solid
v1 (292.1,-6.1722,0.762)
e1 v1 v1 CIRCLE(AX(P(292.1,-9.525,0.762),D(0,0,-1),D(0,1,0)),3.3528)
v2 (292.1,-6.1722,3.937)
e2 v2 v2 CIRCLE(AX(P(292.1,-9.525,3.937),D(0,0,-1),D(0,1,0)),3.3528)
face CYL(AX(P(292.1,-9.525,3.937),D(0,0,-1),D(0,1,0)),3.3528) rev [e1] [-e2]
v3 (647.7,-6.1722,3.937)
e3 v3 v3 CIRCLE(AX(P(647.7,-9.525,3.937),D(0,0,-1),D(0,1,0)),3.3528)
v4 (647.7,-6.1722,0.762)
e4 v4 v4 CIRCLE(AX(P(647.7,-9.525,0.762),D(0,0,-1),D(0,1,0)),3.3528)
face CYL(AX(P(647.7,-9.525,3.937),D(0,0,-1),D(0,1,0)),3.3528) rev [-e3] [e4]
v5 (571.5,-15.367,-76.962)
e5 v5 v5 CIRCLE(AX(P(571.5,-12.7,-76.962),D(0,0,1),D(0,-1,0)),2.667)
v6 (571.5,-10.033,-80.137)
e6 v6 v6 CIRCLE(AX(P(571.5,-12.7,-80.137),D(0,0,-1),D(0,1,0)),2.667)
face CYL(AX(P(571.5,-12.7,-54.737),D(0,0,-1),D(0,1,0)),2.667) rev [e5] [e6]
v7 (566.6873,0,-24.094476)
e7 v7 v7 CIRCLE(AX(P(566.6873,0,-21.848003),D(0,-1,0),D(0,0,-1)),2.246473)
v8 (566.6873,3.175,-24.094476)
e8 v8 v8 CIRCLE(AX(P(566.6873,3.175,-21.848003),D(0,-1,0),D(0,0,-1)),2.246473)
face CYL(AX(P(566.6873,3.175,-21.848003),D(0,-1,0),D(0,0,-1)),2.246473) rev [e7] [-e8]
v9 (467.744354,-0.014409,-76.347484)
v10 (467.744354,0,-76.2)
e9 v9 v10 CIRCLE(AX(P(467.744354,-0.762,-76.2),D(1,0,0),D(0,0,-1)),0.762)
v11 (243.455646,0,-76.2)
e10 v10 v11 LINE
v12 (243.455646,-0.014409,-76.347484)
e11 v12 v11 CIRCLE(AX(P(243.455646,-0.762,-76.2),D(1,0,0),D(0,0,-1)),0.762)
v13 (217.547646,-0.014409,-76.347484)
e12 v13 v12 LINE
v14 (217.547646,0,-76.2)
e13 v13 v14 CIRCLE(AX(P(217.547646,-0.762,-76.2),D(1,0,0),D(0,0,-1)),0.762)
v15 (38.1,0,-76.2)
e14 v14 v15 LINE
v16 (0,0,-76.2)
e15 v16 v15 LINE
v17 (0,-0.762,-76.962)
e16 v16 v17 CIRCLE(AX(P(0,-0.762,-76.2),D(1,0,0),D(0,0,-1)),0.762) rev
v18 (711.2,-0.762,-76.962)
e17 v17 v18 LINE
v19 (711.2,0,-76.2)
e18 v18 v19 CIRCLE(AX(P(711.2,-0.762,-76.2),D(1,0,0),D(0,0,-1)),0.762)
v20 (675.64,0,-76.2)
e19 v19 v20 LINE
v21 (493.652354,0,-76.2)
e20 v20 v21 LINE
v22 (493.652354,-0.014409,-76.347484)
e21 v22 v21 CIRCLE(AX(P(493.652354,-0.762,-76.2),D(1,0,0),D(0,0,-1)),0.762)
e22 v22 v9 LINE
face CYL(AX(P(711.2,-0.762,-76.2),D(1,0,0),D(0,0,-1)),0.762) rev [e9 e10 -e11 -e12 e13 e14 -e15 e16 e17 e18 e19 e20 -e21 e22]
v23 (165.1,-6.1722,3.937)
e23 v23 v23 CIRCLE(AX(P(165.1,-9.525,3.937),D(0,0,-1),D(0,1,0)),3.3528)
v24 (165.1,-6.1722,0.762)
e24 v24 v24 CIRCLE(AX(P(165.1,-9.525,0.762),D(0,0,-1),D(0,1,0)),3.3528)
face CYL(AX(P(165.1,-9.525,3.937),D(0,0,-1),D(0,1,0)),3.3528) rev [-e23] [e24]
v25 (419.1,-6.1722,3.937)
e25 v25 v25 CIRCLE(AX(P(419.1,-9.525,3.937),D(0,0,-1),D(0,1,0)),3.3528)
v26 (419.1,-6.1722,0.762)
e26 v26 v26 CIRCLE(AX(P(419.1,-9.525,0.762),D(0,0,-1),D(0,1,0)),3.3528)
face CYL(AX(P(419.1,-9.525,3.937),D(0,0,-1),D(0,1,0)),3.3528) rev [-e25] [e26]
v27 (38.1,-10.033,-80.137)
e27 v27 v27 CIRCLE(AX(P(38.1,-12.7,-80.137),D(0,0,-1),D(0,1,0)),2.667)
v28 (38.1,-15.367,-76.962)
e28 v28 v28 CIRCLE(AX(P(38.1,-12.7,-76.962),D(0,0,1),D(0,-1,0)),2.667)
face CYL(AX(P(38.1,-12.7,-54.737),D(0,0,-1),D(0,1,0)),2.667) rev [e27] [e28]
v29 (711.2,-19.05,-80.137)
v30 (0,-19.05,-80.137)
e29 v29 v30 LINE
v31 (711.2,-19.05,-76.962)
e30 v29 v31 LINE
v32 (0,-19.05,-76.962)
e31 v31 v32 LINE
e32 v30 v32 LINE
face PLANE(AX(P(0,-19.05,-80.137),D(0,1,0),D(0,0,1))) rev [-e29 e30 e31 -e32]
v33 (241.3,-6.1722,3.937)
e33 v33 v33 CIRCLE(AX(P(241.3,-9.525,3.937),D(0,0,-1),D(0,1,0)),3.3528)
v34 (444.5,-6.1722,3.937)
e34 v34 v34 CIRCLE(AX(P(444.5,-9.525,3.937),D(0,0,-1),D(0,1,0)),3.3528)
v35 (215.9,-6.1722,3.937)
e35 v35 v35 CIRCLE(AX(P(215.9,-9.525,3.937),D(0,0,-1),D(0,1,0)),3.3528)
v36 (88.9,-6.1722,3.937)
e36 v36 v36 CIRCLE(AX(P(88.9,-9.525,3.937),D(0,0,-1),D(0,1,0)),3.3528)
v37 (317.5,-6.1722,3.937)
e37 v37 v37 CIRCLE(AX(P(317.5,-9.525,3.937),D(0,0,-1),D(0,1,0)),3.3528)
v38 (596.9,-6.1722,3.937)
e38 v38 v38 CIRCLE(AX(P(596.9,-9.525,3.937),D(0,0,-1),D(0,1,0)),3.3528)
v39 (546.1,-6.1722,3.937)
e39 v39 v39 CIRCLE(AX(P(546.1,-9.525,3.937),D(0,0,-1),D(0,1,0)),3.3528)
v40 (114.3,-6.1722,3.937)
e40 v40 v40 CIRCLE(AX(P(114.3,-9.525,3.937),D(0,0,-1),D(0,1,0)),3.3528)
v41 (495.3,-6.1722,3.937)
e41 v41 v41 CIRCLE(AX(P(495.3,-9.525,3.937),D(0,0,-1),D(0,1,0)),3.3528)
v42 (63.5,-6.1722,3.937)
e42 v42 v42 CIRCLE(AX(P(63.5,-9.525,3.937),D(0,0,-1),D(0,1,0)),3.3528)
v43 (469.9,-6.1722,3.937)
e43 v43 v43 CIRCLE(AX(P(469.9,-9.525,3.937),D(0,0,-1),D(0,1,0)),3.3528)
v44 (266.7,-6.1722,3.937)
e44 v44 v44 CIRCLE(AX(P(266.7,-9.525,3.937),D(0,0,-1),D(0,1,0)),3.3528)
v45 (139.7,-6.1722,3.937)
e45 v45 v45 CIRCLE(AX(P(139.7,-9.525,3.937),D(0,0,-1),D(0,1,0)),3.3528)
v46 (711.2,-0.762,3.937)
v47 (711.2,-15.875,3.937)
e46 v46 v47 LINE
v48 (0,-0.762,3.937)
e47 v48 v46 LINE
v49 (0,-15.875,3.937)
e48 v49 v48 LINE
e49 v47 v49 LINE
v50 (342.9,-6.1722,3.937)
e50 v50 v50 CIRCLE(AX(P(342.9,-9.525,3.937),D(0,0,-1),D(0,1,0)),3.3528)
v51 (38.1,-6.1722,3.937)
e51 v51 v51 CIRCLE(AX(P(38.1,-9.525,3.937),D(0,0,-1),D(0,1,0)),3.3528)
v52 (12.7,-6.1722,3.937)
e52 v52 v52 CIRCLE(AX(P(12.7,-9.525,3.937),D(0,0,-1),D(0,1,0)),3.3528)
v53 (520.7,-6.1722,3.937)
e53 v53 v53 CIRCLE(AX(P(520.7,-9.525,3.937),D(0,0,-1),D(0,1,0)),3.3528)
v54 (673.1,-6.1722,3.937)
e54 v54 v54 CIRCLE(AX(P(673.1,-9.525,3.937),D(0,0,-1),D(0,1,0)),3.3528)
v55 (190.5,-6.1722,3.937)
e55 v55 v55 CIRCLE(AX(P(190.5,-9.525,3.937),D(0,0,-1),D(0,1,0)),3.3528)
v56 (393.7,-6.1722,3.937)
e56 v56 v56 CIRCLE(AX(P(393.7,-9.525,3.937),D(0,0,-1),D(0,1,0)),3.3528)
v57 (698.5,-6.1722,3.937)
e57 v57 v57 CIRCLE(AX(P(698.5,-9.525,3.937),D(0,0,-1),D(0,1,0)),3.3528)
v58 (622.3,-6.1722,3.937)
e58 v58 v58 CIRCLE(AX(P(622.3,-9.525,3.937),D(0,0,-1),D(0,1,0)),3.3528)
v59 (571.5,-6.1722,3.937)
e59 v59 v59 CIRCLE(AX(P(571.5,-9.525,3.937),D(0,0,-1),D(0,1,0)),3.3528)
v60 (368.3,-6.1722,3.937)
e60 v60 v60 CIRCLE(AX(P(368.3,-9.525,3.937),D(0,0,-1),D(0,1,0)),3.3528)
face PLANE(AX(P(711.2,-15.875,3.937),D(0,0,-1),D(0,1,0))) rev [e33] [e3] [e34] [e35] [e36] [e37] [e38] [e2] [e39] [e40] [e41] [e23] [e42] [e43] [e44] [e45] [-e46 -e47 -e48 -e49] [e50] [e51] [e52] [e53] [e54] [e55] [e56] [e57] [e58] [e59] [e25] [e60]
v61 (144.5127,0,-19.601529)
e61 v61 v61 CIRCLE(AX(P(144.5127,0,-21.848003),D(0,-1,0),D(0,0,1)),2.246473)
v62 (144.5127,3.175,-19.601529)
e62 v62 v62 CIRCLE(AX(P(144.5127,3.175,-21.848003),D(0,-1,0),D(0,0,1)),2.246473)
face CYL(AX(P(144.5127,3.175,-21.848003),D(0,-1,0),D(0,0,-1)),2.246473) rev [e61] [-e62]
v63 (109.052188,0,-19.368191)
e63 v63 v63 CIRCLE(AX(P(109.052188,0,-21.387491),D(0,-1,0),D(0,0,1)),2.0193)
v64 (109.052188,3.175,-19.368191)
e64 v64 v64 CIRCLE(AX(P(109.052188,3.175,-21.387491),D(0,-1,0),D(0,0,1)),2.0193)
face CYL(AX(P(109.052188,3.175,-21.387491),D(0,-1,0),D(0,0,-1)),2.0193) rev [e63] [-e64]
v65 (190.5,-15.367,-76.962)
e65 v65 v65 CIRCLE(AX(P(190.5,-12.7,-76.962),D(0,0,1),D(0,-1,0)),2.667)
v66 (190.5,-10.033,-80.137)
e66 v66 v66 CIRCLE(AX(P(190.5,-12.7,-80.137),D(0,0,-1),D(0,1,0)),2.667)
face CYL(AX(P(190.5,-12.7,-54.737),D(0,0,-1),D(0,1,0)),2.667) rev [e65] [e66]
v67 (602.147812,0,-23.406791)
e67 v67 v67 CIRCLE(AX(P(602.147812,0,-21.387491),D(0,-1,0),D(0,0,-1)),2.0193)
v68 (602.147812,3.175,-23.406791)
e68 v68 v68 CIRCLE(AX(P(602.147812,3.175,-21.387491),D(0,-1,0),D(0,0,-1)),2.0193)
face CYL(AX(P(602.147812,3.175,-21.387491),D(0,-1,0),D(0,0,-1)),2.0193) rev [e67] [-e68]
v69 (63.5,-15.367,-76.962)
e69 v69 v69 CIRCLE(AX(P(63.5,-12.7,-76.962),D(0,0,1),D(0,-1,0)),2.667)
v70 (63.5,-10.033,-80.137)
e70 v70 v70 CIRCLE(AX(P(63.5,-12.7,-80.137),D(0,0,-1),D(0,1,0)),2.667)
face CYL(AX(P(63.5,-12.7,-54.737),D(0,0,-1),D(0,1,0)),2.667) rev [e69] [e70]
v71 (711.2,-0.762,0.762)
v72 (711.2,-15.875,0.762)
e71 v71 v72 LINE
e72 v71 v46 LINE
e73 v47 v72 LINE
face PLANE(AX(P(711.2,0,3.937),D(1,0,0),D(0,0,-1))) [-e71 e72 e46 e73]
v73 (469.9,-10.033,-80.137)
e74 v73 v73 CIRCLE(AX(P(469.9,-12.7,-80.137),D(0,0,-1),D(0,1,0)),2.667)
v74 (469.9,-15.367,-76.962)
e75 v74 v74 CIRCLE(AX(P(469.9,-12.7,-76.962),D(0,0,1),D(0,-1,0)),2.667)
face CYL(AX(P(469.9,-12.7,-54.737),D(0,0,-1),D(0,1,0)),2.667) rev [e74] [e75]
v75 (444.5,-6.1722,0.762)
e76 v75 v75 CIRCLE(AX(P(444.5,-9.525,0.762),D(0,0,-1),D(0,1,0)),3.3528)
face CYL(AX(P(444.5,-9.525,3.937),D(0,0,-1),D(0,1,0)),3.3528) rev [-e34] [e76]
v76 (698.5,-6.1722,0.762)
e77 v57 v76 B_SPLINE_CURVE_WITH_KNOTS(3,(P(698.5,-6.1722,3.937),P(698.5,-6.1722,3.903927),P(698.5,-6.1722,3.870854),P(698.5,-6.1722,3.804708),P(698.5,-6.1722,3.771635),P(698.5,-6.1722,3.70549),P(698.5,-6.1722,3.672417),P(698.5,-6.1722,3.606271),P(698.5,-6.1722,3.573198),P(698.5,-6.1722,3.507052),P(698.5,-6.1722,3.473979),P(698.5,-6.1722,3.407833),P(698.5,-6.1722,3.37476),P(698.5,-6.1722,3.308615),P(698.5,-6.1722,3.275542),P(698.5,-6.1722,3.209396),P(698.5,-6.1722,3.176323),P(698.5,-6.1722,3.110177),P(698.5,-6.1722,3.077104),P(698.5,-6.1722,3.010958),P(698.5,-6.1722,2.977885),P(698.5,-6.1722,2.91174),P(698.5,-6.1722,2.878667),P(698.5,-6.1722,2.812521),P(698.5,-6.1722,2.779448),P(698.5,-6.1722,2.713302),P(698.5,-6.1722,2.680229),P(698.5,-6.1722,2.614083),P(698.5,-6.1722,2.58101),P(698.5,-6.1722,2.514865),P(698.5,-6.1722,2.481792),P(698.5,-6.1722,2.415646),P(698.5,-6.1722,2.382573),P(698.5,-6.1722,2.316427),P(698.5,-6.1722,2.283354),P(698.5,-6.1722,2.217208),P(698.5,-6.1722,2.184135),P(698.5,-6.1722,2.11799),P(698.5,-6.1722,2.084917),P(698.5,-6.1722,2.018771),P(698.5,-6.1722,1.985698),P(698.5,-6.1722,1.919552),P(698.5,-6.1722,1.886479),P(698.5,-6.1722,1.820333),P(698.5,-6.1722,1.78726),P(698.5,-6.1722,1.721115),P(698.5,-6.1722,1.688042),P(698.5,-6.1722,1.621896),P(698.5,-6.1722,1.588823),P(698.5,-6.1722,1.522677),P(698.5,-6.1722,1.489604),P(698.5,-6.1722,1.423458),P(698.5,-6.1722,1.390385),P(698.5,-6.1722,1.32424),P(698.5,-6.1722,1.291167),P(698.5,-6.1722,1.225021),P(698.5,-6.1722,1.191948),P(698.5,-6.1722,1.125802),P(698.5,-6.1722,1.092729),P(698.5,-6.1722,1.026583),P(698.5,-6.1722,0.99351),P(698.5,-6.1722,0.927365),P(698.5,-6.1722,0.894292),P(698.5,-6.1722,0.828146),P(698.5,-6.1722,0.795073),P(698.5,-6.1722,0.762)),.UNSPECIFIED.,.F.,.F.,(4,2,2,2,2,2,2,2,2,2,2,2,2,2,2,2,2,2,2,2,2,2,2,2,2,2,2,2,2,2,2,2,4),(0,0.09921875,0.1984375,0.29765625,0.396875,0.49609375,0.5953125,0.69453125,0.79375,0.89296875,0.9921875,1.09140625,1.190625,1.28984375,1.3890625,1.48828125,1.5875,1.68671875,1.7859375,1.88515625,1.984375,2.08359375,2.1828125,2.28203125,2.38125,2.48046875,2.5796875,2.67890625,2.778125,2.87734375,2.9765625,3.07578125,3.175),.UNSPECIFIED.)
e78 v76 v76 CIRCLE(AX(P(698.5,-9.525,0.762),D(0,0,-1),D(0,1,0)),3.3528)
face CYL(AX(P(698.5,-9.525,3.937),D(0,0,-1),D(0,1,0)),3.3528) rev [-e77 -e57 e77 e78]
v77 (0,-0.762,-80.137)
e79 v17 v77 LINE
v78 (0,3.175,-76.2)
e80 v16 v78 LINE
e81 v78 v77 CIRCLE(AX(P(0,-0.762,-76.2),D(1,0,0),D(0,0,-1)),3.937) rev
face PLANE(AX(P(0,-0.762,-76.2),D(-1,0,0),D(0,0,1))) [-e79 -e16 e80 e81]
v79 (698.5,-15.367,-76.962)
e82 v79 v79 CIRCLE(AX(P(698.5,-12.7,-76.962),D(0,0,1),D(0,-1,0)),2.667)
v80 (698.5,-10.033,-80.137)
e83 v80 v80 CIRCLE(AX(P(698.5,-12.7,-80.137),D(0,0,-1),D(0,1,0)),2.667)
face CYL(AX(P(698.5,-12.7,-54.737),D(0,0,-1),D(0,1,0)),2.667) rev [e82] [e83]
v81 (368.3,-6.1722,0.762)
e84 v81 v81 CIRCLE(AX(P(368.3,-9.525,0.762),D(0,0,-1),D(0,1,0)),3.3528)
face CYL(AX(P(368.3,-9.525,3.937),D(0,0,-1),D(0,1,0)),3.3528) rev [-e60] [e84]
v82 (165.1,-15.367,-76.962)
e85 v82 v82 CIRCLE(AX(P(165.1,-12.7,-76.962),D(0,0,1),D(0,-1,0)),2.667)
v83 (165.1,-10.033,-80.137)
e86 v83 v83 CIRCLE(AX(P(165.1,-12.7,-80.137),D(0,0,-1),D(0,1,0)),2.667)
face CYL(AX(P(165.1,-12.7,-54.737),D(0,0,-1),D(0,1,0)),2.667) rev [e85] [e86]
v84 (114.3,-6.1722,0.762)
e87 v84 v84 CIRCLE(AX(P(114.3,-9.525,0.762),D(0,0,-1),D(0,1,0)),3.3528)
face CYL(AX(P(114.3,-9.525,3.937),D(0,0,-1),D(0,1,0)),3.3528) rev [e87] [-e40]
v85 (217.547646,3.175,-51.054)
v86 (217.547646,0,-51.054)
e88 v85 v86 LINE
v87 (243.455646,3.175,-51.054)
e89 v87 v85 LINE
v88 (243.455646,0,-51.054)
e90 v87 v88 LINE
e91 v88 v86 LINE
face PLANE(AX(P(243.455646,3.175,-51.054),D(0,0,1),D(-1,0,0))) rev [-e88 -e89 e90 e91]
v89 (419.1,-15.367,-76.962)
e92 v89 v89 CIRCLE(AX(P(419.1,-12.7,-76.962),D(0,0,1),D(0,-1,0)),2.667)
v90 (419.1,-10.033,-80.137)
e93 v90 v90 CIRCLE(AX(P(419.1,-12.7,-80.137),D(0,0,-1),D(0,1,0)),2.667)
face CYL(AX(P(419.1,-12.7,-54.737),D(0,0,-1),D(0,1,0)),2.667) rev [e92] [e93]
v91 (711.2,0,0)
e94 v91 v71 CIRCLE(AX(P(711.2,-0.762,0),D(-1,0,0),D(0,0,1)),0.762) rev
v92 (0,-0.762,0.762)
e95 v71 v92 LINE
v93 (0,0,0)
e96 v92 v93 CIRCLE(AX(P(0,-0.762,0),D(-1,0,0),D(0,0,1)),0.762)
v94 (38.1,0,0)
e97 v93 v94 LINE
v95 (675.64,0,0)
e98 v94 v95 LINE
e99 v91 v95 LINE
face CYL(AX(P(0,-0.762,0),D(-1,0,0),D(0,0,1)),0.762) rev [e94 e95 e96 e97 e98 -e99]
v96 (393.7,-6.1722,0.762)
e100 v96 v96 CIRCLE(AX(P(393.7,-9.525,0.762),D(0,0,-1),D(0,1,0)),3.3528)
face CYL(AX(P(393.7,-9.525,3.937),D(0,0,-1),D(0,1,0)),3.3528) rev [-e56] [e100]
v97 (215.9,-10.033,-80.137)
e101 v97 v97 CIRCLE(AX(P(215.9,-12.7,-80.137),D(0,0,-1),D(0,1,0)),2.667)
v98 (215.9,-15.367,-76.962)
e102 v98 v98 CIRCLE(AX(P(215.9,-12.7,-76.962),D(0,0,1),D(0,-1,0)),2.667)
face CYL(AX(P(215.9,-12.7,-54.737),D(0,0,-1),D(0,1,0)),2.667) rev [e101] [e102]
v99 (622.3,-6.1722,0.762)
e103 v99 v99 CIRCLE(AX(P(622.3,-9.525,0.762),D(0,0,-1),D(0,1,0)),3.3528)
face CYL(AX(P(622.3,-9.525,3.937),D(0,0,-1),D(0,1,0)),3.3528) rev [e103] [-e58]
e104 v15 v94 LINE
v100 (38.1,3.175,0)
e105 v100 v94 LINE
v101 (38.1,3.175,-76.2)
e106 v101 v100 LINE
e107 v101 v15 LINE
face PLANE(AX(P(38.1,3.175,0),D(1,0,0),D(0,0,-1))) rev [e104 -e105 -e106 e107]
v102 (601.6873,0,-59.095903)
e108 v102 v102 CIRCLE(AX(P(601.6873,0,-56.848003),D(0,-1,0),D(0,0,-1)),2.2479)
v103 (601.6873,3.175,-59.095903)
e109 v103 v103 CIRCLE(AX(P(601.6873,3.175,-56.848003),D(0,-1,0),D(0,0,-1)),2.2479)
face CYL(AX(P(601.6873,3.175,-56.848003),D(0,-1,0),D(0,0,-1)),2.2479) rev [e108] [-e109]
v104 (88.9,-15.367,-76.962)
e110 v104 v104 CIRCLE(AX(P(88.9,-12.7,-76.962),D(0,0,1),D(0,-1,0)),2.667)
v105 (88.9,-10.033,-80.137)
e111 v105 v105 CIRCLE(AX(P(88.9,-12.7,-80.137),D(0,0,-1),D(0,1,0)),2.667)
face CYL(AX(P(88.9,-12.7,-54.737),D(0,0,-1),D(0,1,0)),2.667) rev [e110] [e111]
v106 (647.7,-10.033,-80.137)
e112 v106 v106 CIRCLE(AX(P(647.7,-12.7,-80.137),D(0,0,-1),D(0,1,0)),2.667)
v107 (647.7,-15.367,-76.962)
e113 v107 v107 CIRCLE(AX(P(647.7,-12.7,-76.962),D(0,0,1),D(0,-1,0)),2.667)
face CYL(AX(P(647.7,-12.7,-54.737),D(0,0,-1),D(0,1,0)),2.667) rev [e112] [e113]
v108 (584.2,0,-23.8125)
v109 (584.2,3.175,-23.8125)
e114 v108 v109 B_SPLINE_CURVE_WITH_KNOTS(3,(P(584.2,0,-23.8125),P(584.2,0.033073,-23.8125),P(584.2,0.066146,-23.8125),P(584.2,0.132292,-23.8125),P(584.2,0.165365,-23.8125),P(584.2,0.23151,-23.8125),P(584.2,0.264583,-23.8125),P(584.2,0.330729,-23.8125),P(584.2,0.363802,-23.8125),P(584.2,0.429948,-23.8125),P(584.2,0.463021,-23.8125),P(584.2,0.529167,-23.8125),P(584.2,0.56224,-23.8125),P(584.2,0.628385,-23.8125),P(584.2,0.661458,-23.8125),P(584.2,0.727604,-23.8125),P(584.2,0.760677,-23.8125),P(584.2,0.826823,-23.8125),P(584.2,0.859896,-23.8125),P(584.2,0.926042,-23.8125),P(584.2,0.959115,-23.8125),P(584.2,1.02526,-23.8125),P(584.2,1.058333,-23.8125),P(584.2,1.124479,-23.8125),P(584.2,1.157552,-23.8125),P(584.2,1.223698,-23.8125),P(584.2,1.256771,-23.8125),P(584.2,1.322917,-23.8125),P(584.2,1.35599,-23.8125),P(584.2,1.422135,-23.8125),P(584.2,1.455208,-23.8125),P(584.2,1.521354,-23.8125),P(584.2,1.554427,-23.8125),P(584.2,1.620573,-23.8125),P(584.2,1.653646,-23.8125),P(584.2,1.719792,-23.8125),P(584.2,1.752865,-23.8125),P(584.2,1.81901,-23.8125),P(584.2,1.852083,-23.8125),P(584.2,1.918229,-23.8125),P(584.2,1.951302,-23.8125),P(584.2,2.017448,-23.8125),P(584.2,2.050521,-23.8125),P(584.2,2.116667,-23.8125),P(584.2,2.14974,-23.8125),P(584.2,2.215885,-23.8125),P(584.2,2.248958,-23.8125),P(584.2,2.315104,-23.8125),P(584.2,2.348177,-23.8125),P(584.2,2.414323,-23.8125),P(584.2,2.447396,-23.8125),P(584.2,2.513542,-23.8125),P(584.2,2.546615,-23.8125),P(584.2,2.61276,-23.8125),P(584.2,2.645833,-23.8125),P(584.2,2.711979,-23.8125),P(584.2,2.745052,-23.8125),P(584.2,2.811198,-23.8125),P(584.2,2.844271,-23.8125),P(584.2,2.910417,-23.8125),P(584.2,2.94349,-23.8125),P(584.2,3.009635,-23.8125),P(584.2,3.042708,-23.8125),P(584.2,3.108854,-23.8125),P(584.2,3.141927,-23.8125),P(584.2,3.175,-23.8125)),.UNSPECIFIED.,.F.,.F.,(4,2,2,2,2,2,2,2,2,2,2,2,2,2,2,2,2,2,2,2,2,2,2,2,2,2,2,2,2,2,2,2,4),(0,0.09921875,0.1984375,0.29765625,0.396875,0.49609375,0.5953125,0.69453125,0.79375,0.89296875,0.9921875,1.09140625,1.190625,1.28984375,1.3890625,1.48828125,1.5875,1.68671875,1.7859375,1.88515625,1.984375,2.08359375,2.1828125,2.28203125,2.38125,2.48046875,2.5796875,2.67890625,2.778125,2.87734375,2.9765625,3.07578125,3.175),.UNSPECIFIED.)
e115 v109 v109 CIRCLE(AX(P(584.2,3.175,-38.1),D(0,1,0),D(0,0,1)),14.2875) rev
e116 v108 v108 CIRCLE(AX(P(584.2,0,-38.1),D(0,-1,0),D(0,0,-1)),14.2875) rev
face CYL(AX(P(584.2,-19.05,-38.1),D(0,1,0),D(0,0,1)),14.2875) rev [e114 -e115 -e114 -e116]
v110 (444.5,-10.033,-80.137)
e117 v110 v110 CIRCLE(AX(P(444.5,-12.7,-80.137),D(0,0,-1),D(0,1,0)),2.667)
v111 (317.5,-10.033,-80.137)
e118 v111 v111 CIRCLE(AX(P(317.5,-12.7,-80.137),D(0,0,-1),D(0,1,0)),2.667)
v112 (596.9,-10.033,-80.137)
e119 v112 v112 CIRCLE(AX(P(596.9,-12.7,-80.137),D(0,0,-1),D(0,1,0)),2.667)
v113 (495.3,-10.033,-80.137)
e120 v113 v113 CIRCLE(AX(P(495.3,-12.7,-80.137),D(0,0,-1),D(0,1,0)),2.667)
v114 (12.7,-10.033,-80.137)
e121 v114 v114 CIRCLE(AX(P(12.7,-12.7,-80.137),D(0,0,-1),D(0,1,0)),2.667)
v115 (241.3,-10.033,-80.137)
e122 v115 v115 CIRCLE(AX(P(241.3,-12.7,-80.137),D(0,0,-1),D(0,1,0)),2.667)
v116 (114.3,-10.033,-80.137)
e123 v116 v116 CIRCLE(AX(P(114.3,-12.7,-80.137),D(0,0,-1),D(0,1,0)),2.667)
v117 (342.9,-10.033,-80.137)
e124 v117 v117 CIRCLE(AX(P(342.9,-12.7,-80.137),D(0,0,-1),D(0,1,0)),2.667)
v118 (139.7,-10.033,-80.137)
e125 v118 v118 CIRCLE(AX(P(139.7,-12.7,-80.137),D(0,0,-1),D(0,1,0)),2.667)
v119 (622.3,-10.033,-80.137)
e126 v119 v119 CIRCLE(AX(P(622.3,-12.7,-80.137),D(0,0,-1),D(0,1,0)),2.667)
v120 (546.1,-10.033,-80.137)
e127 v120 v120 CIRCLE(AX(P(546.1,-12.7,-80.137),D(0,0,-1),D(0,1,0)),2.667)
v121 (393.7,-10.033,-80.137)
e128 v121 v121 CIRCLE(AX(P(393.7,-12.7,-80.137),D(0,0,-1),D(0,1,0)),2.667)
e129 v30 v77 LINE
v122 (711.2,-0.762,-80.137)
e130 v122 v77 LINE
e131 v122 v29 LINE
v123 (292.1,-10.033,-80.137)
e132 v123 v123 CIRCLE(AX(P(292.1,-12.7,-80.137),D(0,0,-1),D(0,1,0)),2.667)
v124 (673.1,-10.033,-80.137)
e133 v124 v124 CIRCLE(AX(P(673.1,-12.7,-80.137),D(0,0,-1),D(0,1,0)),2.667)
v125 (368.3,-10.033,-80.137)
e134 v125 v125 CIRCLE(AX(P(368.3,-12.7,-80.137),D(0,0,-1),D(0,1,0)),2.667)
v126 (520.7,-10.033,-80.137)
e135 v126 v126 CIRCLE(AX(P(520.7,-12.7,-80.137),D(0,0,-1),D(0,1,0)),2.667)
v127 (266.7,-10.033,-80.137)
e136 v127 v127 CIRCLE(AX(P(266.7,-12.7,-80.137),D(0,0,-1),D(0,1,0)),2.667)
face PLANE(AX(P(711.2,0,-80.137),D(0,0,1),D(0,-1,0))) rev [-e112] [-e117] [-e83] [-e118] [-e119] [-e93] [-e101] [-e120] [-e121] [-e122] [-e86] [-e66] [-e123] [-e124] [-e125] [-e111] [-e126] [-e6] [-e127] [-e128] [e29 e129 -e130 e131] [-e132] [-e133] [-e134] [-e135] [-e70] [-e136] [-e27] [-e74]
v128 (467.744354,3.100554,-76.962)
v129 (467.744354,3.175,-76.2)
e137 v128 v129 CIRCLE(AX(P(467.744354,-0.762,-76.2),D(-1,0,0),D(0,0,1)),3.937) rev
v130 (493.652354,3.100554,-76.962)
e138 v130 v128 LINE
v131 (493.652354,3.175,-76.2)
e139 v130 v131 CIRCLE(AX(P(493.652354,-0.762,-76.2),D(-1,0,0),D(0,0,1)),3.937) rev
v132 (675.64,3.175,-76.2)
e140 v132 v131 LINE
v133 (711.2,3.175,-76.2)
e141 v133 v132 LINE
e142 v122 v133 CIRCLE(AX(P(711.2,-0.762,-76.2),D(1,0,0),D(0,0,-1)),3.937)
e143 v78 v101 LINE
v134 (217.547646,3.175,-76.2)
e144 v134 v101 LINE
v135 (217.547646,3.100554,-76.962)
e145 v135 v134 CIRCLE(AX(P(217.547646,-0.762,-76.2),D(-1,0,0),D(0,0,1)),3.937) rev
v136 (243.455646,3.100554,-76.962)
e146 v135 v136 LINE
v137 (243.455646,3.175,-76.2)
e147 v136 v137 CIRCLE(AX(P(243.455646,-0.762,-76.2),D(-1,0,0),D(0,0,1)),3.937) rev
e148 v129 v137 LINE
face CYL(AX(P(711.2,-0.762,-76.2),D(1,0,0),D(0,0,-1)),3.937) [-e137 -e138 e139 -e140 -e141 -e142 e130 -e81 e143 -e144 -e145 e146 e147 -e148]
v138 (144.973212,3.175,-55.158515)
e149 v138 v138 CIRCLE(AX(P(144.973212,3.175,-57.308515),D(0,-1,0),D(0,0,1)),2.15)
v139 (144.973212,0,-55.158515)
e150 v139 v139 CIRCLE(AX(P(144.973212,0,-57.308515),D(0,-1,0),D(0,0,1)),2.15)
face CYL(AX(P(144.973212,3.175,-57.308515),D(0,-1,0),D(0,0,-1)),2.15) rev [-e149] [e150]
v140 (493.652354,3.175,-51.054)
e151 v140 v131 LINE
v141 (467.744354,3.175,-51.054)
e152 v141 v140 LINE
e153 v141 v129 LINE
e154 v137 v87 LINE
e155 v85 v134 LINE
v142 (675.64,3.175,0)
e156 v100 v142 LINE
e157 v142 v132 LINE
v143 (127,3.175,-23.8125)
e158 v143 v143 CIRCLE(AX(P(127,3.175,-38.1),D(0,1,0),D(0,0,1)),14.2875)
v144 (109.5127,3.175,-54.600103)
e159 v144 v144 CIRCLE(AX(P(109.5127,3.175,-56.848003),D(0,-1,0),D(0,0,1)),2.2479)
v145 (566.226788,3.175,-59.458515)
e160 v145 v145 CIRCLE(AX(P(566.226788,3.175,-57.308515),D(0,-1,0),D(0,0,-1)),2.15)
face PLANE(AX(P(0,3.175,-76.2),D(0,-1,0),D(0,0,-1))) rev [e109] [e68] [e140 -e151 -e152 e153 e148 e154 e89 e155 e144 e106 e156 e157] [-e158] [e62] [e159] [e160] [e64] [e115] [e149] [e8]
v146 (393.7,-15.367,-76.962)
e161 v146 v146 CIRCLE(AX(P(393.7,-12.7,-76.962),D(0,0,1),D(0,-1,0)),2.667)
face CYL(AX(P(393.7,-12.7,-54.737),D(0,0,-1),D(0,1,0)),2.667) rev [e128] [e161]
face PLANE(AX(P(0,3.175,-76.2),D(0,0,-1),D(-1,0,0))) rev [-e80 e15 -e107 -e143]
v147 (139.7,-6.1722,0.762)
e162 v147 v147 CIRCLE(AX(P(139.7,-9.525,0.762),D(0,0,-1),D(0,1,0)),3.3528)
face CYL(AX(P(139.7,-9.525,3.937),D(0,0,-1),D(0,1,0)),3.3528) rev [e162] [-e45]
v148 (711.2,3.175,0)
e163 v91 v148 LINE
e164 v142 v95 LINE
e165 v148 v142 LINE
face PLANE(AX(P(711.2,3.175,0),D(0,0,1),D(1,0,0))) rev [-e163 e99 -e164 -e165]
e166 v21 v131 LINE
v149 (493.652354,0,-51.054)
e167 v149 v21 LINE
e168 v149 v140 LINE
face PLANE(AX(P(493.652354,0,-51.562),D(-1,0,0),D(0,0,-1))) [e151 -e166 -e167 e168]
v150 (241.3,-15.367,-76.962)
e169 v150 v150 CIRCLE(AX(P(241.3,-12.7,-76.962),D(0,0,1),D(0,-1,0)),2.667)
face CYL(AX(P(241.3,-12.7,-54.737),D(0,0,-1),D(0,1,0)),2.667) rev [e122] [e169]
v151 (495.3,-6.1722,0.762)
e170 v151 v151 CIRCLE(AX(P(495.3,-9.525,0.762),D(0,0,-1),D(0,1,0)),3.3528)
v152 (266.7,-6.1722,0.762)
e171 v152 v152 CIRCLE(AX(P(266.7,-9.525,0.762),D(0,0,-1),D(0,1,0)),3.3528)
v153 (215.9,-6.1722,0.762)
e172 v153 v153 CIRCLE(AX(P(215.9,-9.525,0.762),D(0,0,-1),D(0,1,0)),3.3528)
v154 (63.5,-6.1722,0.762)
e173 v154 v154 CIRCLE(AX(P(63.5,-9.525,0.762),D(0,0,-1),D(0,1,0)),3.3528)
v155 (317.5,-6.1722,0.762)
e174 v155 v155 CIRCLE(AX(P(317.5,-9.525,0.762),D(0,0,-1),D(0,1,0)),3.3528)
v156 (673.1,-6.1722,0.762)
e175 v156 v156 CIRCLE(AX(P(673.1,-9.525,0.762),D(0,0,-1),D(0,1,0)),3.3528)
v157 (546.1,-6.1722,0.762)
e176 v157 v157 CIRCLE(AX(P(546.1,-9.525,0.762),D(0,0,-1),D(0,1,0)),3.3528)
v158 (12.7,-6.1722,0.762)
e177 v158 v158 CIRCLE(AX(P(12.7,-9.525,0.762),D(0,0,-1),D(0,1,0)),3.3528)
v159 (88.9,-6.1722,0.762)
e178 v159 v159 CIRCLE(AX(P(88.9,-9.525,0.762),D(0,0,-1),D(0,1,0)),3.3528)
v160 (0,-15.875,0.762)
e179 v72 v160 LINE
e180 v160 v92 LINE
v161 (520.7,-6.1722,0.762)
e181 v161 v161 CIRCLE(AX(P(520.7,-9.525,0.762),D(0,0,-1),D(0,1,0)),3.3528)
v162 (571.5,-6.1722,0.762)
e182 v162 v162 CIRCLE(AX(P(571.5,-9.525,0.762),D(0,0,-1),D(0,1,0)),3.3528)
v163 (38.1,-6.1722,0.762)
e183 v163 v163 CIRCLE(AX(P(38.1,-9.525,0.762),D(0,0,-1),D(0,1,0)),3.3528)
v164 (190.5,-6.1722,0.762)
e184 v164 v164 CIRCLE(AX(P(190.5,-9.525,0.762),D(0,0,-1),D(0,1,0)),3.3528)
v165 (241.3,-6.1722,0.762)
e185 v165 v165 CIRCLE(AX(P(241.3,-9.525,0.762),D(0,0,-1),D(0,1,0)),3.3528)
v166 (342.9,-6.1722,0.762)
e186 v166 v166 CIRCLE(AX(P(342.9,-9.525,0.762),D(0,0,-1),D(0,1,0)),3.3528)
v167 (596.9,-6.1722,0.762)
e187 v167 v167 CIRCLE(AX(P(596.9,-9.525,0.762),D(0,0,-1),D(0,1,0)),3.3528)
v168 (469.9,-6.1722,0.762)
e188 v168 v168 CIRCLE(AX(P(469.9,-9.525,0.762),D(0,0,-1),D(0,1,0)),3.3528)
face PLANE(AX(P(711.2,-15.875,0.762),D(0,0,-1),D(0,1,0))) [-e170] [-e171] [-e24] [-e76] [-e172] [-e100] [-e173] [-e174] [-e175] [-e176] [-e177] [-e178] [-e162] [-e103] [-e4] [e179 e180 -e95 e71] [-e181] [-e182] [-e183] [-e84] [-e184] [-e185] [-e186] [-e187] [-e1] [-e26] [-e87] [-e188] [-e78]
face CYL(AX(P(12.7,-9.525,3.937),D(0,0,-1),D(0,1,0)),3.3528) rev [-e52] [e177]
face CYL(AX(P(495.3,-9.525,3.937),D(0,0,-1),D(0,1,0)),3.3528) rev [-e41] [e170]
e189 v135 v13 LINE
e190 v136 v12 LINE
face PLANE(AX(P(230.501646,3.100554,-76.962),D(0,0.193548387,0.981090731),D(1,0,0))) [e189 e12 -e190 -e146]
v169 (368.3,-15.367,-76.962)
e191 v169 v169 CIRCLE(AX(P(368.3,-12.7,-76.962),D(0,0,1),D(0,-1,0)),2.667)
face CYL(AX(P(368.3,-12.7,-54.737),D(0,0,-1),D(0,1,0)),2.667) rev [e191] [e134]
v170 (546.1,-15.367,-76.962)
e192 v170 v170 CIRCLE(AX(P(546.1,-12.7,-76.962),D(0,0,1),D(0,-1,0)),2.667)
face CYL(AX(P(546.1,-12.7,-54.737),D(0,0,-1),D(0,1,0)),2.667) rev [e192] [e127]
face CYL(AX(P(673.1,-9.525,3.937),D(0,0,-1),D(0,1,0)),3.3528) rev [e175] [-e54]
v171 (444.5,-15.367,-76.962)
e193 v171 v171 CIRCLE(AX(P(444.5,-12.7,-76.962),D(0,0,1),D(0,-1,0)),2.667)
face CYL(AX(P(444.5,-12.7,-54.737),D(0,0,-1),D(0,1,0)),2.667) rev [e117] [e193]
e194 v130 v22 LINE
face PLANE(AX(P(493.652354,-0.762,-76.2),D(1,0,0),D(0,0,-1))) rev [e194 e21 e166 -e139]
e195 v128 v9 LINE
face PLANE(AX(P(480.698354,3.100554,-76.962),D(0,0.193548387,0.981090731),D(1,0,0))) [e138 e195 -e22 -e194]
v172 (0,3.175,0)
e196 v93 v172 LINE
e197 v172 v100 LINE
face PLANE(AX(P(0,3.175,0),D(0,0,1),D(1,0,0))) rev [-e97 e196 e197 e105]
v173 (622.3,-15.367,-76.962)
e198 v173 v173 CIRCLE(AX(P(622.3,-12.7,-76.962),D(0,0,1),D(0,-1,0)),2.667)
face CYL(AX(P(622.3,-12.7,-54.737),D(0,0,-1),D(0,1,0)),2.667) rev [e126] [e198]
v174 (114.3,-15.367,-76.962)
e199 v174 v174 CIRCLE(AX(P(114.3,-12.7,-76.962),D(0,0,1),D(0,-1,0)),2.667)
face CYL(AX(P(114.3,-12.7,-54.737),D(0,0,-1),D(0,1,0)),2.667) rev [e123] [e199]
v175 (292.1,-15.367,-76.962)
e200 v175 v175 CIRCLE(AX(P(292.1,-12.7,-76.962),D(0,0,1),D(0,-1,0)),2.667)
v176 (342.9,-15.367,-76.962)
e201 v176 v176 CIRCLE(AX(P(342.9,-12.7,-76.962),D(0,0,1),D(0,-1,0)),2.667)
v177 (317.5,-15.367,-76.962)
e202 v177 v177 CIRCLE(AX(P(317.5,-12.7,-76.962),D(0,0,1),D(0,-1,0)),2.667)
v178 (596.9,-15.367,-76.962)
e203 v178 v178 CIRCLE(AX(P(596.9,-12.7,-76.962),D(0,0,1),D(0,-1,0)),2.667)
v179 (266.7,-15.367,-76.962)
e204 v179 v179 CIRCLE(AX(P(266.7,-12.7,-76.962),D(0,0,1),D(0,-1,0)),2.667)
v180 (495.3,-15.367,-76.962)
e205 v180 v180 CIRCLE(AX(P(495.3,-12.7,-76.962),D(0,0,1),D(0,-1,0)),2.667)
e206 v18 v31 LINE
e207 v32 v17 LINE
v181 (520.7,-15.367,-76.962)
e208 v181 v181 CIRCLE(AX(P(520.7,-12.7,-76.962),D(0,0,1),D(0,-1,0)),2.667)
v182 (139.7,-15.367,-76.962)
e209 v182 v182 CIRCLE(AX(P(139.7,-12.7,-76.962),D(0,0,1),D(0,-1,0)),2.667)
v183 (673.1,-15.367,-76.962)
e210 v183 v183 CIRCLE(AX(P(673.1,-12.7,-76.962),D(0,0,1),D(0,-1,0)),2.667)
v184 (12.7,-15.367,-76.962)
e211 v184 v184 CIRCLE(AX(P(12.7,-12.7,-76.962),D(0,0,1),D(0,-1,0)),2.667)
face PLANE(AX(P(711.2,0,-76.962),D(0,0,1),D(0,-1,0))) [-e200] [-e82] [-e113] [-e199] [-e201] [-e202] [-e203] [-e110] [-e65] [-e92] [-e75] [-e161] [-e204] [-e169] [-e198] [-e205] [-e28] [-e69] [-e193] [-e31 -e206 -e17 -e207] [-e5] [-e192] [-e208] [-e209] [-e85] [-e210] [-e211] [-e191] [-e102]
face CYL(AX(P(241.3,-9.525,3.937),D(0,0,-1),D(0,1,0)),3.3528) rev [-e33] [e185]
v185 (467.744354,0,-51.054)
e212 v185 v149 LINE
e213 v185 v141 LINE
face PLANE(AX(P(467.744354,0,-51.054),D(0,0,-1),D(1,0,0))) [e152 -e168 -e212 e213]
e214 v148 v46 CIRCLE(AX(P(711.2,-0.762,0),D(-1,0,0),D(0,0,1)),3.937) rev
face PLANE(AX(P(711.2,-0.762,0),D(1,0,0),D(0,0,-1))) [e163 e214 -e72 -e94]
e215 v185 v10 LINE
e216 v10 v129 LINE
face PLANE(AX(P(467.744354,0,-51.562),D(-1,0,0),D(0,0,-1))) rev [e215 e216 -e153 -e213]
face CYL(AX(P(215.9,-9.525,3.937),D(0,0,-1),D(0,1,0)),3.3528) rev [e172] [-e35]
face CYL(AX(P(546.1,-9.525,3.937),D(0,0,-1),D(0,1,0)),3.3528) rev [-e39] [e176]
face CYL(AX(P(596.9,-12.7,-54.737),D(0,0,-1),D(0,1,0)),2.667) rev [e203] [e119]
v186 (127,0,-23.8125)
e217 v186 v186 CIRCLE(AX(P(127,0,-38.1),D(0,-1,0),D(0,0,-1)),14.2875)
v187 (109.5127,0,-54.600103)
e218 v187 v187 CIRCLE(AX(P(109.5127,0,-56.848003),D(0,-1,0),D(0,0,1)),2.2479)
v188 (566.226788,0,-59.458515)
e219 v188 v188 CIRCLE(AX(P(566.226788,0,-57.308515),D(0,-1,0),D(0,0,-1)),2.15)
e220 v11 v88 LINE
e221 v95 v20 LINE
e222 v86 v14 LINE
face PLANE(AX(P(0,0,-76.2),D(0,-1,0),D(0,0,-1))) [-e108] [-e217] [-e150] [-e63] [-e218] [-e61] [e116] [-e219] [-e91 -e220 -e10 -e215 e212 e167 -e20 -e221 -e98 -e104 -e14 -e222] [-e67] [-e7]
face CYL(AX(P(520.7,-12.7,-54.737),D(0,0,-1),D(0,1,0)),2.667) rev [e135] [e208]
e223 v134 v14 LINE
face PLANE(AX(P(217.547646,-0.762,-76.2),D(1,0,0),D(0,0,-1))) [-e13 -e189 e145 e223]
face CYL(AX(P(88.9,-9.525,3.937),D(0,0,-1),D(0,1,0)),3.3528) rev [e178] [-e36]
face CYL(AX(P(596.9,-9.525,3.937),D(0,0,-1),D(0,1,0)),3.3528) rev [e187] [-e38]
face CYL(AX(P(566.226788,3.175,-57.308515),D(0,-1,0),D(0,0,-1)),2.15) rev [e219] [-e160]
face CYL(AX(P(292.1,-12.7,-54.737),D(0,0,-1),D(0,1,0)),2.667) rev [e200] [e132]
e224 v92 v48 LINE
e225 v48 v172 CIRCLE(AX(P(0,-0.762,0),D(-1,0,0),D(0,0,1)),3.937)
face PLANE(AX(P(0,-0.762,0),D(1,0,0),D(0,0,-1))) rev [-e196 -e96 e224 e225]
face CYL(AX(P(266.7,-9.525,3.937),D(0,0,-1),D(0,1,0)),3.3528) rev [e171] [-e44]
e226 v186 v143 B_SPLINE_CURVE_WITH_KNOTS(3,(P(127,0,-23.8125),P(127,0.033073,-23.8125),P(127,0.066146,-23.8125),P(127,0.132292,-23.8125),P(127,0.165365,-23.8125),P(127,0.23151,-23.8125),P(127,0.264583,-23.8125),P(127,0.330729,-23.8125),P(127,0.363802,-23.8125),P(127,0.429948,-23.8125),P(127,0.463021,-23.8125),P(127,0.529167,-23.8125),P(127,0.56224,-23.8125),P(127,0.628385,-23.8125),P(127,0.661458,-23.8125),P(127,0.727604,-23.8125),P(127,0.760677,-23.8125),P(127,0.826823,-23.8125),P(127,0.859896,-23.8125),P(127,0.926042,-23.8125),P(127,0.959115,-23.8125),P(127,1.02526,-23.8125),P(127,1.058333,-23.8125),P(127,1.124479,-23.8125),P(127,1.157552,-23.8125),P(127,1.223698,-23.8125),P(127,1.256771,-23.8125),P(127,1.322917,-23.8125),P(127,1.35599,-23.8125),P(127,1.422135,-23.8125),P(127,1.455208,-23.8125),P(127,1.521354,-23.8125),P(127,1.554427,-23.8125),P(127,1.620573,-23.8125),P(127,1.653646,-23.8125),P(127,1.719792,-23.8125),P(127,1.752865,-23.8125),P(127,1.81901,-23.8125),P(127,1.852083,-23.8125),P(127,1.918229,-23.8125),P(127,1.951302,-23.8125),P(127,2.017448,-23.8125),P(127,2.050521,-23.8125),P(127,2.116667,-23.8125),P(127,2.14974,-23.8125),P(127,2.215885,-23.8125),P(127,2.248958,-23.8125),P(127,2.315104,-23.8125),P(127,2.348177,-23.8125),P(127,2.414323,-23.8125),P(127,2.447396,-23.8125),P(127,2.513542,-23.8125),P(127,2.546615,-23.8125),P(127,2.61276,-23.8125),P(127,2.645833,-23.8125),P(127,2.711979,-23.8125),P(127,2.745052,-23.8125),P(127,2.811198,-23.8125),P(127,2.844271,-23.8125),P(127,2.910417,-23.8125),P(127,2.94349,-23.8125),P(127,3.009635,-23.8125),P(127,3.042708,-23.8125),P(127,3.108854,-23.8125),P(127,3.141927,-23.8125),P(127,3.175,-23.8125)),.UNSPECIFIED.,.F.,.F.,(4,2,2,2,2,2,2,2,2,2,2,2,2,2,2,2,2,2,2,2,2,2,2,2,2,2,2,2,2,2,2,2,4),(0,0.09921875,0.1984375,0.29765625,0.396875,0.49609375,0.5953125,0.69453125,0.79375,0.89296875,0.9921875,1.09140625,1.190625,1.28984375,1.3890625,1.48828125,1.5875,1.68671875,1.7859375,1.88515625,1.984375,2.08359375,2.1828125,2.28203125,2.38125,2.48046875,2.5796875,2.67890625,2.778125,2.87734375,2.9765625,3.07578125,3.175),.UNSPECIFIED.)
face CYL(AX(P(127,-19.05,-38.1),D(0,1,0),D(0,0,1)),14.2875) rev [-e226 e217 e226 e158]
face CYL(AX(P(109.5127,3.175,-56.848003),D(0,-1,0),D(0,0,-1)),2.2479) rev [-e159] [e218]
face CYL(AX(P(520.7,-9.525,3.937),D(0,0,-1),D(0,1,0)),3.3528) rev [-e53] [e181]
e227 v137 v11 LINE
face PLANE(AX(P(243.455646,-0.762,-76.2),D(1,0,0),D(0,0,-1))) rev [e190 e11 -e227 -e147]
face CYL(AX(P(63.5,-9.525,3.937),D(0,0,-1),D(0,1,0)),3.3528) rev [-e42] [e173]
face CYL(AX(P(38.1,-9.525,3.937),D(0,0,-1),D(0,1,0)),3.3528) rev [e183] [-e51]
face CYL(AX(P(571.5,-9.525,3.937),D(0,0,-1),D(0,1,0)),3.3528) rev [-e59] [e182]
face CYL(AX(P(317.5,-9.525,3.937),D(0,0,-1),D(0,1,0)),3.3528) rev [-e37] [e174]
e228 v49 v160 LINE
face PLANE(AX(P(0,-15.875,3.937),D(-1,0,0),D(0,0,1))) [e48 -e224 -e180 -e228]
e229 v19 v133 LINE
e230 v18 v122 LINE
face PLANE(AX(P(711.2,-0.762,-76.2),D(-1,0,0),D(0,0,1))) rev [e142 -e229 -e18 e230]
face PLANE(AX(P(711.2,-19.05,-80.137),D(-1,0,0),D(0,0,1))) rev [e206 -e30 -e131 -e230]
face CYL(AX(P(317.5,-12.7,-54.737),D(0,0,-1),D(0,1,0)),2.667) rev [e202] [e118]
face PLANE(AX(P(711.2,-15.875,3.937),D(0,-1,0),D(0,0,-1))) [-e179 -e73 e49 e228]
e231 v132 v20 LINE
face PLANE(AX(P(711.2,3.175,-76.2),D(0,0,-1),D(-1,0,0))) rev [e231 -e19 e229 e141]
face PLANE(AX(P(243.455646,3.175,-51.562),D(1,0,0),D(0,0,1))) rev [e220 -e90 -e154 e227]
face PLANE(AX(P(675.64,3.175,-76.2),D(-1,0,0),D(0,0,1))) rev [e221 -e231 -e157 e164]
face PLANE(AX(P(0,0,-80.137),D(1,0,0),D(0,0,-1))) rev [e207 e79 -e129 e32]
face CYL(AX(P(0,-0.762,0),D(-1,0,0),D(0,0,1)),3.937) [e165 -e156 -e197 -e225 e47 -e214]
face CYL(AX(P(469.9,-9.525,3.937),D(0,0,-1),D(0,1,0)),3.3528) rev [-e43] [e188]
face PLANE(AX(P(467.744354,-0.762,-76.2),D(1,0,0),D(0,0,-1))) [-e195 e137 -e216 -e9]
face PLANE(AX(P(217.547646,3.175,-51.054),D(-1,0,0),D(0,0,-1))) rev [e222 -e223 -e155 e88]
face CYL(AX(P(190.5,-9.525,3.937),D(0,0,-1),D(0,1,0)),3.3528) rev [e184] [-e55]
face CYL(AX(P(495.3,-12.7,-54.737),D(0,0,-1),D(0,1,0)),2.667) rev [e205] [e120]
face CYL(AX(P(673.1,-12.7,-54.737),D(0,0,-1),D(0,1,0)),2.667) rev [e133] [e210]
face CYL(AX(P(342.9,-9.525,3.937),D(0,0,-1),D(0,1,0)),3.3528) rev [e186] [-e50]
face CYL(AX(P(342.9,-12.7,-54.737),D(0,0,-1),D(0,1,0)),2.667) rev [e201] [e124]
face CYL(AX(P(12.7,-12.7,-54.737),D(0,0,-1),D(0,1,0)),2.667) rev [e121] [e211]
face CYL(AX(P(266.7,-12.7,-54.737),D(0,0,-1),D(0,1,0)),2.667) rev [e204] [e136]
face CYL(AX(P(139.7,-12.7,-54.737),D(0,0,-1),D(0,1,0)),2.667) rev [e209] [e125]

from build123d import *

# Parameters (mm, degrees)
SKETCH1_W             = 711.2
SKETCH1_H             = 76.2
BOSS_EXTRUDE1_DEPTH   = 3.175
EDGE_FLANGE1_DEPTH    = 711.2
EDGE_FLANGE2_DEPTH    = 711.2
SKETCH14_R            = 2.667
UPPER_FLANGE_HP_DEPTH = 25.4
SKETCH16_R            = 3.3528
LOWER_FLANGE_HP_DEPTH = 717.03979687
LPATTERN1_COUNT       = 32
LPATTERN1_PITCH       = 25.4
SKETCH29_R            = 14.2875
CUT_EXTRUDE16_DEPTH   = 717.045619632
SKETCH31_W            = 35.56
SKETCH31_H            = 76.2
CUT_EXTRUDE11_DEPTH   = 716.954105561
SKETCH32_W            = 38.1
SKETCH32_H            = 76.2
CUT_EXTRUDE12_DEPTH   = 716.954105561
CUT_EXTRUDE13_START   = 217.547646287
CUT_EXTRUDE13_DEPTH   = 25.908
CUT_EXTRUDE13_START_2 = 467.744353713
CUT_EXTRUDE13_2_DEPTH = 25.908
SKETCH33_R            = 2.2479
SKETCH33_R_2          = 2.15
SKETCH33_R_3          = 2.24647347
SKETCH33_R_4          = 2.0193
CUT_EXTRUDE14_DEPTH   = 716.954105561


# Read off the part's stored shape, not the designer's step: Cut-Extrude13
# Sheet-metal steps are written as plain solids
with BuildPart() as part:
    # Sketch1 → Boss-Extrude1 (new body)
    with BuildSketch(Plane(origin=(0, 0, 0), x_dir=(1, 0, 0), z_dir=(0, 1, 0))):
        with Locations((355.6, 38.1)):
            Rectangle(SKETCH1_W, SKETCH1_H)
    extrude(amount=BOSS_EXTRUDE1_DEPTH)

    # Edge-Flange1 section (across the edge) → Edge-Flange1 (add)
    with BuildSketch(Plane(origin=(711.2, 0, 0.762), x_dir=(0, 0, -1), z_dir=(-1, 0, 0))):
        with BuildLine():
            Line((-3.175, 0.762), (-3.175, 15.875))
            Line((-3.175, 15.875), (0, 15.875))
            Line((0, 15.875), (0, 0.762))
            ThreePointArc((0, 0.762), (0.223184633, 0.223184633), (0.762, 0))
            Line((0.762, 0), (0.762, -3.175))
            ThreePointArc((0.762, -3.175), (-2.021879398, -2.021879398), (-3.175, 0.762))
        make_face()
    extrude(amount=EDGE_FLANGE1_DEPTH)

    # Edge-Flange2 section (across the edge) → Edge-Flange2 (add)
    with BuildSketch(Plane(origin=(0, 0, -76.962), x_dir=(0, 0, 1), z_dir=(1, 0, 0))):
        with BuildLine():
            Line((-3.175, 0.762), (-3.175, 19.05))
            Line((-3.175, 19.05), (0, 19.05))
            Line((0, 19.05), (0, 0.762))
            ThreePointArc((0, 0.762), (0.223184633, 0.223184633), (0.762, 0))
            Line((0.762, 0), (0.762, -3.175))
            ThreePointArc((0.762, -3.175), (-2.021879398, -2.021879398), (-3.175, 0.762))
        make_face()
    extrude(amount=EDGE_FLANGE2_DEPTH)

    # Sketch14 → upper flange HP (cut)
    with BuildSketch(Plane(origin=(0, 0, -80.137), x_dir=(-1, 0, 0), z_dir=(0, 0, -1))):
        with Locations(Location((-12.7, -12.7, 0), (0, 0, 90))):
            Circle(SKETCH14_R)
        with Locations(Location((-38.1, -12.7, 0), (0, 0, 90))):
            Circle(SKETCH14_R)
        with Locations(Location((-63.5, -12.7, 0), (0, 0, 90))):
            Circle(SKETCH14_R)
        with Locations(Location((-88.9, -12.7, 0), (0, 0, 90))):
            Circle(SKETCH14_R)
        with Locations(Location((-114.3, -12.7, 0), (0, 0, 90))):
            Circle(SKETCH14_R)
        with Locations(Location((-139.7, -12.7, 0), (0, 0, 90))):
            Circle(SKETCH14_R)
        with Locations(Location((-165.1, -12.7, 0), (0, 0, 90))):
            Circle(SKETCH14_R)
        with Locations(Location((-190.5, -12.7, 0), (0, 0, 90))):
            Circle(SKETCH14_R)
        with Locations(Location((-215.9, -12.7, 0), (0, 0, 90))):
            Circle(SKETCH14_R)
        with Locations(Location((-241.3, -12.7, 0), (0, 0, 90))):
            Circle(SKETCH14_R)
        with Locations(Location((-266.7, -12.7, 0), (0, 0, 90))):
            Circle(SKETCH14_R)
        with Locations(Location((-292.1, -12.7, 0), (0, 0, 90))):
            Circle(SKETCH14_R)
        with Locations(Location((-317.5, -12.7, 0), (0, 0, 90))):
            Circle(SKETCH14_R)
        with Locations(Location((-342.9, -12.7, 0), (0, 0, 90))):
            Circle(SKETCH14_R)
        with Locations(Location((-368.3, -12.7, 0), (0, 0, 90))):
            Circle(SKETCH14_R)
        with Locations(Location((-393.7, -12.7, 0), (0, 0, 90))):
            Circle(SKETCH14_R)
        with Locations(Location((-419.1, -12.7, 0), (0, 0, 90))):
            Circle(SKETCH14_R)
        with Locations(Location((-444.5, -12.7, 0), (0, 0, 90))):
            Circle(SKETCH14_R)
        with Locations(Location((-469.9, -12.7, 0), (0, 0, 90))):
            Circle(SKETCH14_R)
        with Locations(Location((-495.3, -12.7, 0), (0, 0, 90))):
            Circle(SKETCH14_R)
        with Locations(Location((-520.7, -12.7, 0), (0, 0, 90))):
            Circle(SKETCH14_R)
        with Locations(Location((-546.1, -12.7, 0), (0, 0, 90))):
            Circle(SKETCH14_R)
        with Locations(Location((-571.5, -12.7, 0), (0, 0, 90))):
            Circle(SKETCH14_R)
        with Locations(Location((-596.9, -12.7, 0), (0, 0, 90))):
            Circle(SKETCH14_R)
        with Locations(Location((-622.3, -12.7, 0), (0, 0, 90))):
            Circle(SKETCH14_R)
        with Locations(Location((-647.7, -12.7, 0), (0, 0, 90))):
            Circle(SKETCH14_R)
        with Locations(Location((-673.1, -12.7, 0), (0, 0, 90))):
            Circle(SKETCH14_R)
        with Locations(Location((-698.5, -12.7, 0), (0, 0, 90))):
            Circle(SKETCH14_R)
        with Locations((-723.9, -12.7)):
            Circle(SKETCH14_R)
        with Locations((-749.3, -12.7)):
            Circle(SKETCH14_R)
        with Locations((-774.7, -12.7)):
            Circle(SKETCH14_R)
        with Locations((-800.1, -12.7)):
            Circle(SKETCH14_R)
    extrude(amount=-UPPER_FLANGE_HP_DEPTH, mode=Mode.SUBTRACT)

    # Sketch16 → Lower flange HP (cut, through all)
    with BuildSketch(Plane(origin=(0, 0, 0.762), x_dir=(-1, 0, 0), z_dir=(0, 0, -1))):
        with Locations(Location((-698.5, -9.525, 0), (0, 0, 90))):
            Circle(SKETCH16_R)
    lower_flange_hp = extrude(amount=-LOWER_FLANGE_HP_DEPTH, mode=Mode.SUBTRACT)

    # LPattern1: Lower flange HP ×32
    with Locations(*[(-i * LPATTERN1_PITCH, 0, 0) for i in range(1, LPATTERN1_COUNT)]):
        add(lower_flange_hp, mode=Mode.SUBTRACT)

    # Sketch29 → Cut-Extrude16 (cut, through all)
    with BuildSketch(Plane(origin=(0, 3.175, 0), x_dir=(1, 0, 0), z_dir=(0, 1, 0))):
        with Locations(Location((584.2, 38.1, 0), (0, 0, 270))):
            Circle(SKETCH29_R)
        with Locations(Location((127, 38.1, 0), (0, 0, 270))):
            Circle(SKETCH29_R)
    extrude(amount=-CUT_EXTRUDE16_DEPTH, mode=Mode.SUBTRACT)

    # Sketch31 → Cut-Extrude11 (cut, through all)
    with BuildSketch(Plane.XZ):
        with Locations((693.42, -38.1)):
            Rectangle(SKETCH31_W, SKETCH31_H)
    extrude(amount=-CUT_EXTRUDE11_DEPTH, mode=Mode.SUBTRACT)

    # Sketch32 → Cut-Extrude12 (cut, through all)
    with BuildSketch(Plane.XZ):
        with Locations((19.05, -38.1)):
            Rectangle(SKETCH32_W, SKETCH32_H)
    extrude(amount=-CUT_EXTRUDE12_DEPTH, mode=Mode.SUBTRACT)

    # Cut-Extrude13 outline → Cut-Extrude13 (cut)
    with BuildSketch(Plane.YZ.offset(CUT_EXTRUDE13_START)):
        with BuildLine():
            Line((3.175, -76.2), (3.175, -51.054))
            Line((3.175, -51.054), (0, -51.054))
            Line((0, -51.054), (0, -76.2))
            ThreePointArc((0, -76.2), (-0.003610771, -76.274093029), (-0.014408863, -76.347483871))
            Line((-0.014408863, -76.347483871), (3.100554207, -76.962))
            ThreePointArc((3.100554207, -76.962), (3.156344352, -76.582813981), (3.175, -76.2))
        make_face()
    extrude(amount=CUT_EXTRUDE13_DEPTH, mode=Mode.SUBTRACT)

    # Cut-Extrude13 2 outline → Cut-Extrude13 2 (cut)
    with BuildSketch(Plane.YZ.offset(CUT_EXTRUDE13_START_2)):
        with BuildLine():
            Line((3.175, -76.2), (3.175, -51.054))
            Line((3.175, -51.054), (0, -51.054))
            Line((0, -51.054), (0, -76.2))
            ThreePointArc((0, -76.2), (-0.003610771, -76.274093029), (-0.014408863, -76.347483871))
            Line((-0.014408863, -76.347483871), (3.100554207, -76.962))
            ThreePointArc((3.100554207, -76.962), (3.156344352, -76.582813981), (3.175, -76.2))
        make_face()
    extrude(amount=CUT_EXTRUDE13_2_DEPTH, mode=Mode.SUBTRACT)

    # Sketch33 → Cut-Extrude14 (cut, through all)
    with BuildSketch(Plane(origin=(0, 0, 0), x_dir=(-1, 0, 0), z_dir=(0, -1, 0))):
        with Locations(Location((-109.5127, 56.848002955, 0), (0, 0, 270))):
            Circle(SKETCH33_R)
        with Locations(Location((-144.973212242, 57.308515197, 0), (0, 0, 270))):
            Circle(SKETCH33_R_2)
        with Locations(Location((-144.5127, 21.848002955, 0), (0, 0, 270))):
            Circle(SKETCH33_R_3)
        with Locations(Location((-109.052187758, 21.387490713, 0), (0, 0, 270))):
            Circle(SKETCH33_R_4)
        with Locations(Location((-602.147812242, 21.387490713, 0), (0, 0, 90))):
            Circle(SKETCH33_R_4)
        with Locations(Location((-566.6873, 21.848002955, 0), (0, 0, 90))):
            Circle(SKETCH33_R_3)
        with Locations(Location((-566.226787758, 57.308515197, 0), (0, 0, 90))):
            Circle(SKETCH33_R_2)
        with Locations(Location((-601.6873, 56.848002955, 0), (0, 0, 90))):
            Circle(SKETCH33_R)
    extrude(amount=-CUT_EXTRUDE14_DEPTH, mode=Mode.SUBTRACT)


solid = part.part
